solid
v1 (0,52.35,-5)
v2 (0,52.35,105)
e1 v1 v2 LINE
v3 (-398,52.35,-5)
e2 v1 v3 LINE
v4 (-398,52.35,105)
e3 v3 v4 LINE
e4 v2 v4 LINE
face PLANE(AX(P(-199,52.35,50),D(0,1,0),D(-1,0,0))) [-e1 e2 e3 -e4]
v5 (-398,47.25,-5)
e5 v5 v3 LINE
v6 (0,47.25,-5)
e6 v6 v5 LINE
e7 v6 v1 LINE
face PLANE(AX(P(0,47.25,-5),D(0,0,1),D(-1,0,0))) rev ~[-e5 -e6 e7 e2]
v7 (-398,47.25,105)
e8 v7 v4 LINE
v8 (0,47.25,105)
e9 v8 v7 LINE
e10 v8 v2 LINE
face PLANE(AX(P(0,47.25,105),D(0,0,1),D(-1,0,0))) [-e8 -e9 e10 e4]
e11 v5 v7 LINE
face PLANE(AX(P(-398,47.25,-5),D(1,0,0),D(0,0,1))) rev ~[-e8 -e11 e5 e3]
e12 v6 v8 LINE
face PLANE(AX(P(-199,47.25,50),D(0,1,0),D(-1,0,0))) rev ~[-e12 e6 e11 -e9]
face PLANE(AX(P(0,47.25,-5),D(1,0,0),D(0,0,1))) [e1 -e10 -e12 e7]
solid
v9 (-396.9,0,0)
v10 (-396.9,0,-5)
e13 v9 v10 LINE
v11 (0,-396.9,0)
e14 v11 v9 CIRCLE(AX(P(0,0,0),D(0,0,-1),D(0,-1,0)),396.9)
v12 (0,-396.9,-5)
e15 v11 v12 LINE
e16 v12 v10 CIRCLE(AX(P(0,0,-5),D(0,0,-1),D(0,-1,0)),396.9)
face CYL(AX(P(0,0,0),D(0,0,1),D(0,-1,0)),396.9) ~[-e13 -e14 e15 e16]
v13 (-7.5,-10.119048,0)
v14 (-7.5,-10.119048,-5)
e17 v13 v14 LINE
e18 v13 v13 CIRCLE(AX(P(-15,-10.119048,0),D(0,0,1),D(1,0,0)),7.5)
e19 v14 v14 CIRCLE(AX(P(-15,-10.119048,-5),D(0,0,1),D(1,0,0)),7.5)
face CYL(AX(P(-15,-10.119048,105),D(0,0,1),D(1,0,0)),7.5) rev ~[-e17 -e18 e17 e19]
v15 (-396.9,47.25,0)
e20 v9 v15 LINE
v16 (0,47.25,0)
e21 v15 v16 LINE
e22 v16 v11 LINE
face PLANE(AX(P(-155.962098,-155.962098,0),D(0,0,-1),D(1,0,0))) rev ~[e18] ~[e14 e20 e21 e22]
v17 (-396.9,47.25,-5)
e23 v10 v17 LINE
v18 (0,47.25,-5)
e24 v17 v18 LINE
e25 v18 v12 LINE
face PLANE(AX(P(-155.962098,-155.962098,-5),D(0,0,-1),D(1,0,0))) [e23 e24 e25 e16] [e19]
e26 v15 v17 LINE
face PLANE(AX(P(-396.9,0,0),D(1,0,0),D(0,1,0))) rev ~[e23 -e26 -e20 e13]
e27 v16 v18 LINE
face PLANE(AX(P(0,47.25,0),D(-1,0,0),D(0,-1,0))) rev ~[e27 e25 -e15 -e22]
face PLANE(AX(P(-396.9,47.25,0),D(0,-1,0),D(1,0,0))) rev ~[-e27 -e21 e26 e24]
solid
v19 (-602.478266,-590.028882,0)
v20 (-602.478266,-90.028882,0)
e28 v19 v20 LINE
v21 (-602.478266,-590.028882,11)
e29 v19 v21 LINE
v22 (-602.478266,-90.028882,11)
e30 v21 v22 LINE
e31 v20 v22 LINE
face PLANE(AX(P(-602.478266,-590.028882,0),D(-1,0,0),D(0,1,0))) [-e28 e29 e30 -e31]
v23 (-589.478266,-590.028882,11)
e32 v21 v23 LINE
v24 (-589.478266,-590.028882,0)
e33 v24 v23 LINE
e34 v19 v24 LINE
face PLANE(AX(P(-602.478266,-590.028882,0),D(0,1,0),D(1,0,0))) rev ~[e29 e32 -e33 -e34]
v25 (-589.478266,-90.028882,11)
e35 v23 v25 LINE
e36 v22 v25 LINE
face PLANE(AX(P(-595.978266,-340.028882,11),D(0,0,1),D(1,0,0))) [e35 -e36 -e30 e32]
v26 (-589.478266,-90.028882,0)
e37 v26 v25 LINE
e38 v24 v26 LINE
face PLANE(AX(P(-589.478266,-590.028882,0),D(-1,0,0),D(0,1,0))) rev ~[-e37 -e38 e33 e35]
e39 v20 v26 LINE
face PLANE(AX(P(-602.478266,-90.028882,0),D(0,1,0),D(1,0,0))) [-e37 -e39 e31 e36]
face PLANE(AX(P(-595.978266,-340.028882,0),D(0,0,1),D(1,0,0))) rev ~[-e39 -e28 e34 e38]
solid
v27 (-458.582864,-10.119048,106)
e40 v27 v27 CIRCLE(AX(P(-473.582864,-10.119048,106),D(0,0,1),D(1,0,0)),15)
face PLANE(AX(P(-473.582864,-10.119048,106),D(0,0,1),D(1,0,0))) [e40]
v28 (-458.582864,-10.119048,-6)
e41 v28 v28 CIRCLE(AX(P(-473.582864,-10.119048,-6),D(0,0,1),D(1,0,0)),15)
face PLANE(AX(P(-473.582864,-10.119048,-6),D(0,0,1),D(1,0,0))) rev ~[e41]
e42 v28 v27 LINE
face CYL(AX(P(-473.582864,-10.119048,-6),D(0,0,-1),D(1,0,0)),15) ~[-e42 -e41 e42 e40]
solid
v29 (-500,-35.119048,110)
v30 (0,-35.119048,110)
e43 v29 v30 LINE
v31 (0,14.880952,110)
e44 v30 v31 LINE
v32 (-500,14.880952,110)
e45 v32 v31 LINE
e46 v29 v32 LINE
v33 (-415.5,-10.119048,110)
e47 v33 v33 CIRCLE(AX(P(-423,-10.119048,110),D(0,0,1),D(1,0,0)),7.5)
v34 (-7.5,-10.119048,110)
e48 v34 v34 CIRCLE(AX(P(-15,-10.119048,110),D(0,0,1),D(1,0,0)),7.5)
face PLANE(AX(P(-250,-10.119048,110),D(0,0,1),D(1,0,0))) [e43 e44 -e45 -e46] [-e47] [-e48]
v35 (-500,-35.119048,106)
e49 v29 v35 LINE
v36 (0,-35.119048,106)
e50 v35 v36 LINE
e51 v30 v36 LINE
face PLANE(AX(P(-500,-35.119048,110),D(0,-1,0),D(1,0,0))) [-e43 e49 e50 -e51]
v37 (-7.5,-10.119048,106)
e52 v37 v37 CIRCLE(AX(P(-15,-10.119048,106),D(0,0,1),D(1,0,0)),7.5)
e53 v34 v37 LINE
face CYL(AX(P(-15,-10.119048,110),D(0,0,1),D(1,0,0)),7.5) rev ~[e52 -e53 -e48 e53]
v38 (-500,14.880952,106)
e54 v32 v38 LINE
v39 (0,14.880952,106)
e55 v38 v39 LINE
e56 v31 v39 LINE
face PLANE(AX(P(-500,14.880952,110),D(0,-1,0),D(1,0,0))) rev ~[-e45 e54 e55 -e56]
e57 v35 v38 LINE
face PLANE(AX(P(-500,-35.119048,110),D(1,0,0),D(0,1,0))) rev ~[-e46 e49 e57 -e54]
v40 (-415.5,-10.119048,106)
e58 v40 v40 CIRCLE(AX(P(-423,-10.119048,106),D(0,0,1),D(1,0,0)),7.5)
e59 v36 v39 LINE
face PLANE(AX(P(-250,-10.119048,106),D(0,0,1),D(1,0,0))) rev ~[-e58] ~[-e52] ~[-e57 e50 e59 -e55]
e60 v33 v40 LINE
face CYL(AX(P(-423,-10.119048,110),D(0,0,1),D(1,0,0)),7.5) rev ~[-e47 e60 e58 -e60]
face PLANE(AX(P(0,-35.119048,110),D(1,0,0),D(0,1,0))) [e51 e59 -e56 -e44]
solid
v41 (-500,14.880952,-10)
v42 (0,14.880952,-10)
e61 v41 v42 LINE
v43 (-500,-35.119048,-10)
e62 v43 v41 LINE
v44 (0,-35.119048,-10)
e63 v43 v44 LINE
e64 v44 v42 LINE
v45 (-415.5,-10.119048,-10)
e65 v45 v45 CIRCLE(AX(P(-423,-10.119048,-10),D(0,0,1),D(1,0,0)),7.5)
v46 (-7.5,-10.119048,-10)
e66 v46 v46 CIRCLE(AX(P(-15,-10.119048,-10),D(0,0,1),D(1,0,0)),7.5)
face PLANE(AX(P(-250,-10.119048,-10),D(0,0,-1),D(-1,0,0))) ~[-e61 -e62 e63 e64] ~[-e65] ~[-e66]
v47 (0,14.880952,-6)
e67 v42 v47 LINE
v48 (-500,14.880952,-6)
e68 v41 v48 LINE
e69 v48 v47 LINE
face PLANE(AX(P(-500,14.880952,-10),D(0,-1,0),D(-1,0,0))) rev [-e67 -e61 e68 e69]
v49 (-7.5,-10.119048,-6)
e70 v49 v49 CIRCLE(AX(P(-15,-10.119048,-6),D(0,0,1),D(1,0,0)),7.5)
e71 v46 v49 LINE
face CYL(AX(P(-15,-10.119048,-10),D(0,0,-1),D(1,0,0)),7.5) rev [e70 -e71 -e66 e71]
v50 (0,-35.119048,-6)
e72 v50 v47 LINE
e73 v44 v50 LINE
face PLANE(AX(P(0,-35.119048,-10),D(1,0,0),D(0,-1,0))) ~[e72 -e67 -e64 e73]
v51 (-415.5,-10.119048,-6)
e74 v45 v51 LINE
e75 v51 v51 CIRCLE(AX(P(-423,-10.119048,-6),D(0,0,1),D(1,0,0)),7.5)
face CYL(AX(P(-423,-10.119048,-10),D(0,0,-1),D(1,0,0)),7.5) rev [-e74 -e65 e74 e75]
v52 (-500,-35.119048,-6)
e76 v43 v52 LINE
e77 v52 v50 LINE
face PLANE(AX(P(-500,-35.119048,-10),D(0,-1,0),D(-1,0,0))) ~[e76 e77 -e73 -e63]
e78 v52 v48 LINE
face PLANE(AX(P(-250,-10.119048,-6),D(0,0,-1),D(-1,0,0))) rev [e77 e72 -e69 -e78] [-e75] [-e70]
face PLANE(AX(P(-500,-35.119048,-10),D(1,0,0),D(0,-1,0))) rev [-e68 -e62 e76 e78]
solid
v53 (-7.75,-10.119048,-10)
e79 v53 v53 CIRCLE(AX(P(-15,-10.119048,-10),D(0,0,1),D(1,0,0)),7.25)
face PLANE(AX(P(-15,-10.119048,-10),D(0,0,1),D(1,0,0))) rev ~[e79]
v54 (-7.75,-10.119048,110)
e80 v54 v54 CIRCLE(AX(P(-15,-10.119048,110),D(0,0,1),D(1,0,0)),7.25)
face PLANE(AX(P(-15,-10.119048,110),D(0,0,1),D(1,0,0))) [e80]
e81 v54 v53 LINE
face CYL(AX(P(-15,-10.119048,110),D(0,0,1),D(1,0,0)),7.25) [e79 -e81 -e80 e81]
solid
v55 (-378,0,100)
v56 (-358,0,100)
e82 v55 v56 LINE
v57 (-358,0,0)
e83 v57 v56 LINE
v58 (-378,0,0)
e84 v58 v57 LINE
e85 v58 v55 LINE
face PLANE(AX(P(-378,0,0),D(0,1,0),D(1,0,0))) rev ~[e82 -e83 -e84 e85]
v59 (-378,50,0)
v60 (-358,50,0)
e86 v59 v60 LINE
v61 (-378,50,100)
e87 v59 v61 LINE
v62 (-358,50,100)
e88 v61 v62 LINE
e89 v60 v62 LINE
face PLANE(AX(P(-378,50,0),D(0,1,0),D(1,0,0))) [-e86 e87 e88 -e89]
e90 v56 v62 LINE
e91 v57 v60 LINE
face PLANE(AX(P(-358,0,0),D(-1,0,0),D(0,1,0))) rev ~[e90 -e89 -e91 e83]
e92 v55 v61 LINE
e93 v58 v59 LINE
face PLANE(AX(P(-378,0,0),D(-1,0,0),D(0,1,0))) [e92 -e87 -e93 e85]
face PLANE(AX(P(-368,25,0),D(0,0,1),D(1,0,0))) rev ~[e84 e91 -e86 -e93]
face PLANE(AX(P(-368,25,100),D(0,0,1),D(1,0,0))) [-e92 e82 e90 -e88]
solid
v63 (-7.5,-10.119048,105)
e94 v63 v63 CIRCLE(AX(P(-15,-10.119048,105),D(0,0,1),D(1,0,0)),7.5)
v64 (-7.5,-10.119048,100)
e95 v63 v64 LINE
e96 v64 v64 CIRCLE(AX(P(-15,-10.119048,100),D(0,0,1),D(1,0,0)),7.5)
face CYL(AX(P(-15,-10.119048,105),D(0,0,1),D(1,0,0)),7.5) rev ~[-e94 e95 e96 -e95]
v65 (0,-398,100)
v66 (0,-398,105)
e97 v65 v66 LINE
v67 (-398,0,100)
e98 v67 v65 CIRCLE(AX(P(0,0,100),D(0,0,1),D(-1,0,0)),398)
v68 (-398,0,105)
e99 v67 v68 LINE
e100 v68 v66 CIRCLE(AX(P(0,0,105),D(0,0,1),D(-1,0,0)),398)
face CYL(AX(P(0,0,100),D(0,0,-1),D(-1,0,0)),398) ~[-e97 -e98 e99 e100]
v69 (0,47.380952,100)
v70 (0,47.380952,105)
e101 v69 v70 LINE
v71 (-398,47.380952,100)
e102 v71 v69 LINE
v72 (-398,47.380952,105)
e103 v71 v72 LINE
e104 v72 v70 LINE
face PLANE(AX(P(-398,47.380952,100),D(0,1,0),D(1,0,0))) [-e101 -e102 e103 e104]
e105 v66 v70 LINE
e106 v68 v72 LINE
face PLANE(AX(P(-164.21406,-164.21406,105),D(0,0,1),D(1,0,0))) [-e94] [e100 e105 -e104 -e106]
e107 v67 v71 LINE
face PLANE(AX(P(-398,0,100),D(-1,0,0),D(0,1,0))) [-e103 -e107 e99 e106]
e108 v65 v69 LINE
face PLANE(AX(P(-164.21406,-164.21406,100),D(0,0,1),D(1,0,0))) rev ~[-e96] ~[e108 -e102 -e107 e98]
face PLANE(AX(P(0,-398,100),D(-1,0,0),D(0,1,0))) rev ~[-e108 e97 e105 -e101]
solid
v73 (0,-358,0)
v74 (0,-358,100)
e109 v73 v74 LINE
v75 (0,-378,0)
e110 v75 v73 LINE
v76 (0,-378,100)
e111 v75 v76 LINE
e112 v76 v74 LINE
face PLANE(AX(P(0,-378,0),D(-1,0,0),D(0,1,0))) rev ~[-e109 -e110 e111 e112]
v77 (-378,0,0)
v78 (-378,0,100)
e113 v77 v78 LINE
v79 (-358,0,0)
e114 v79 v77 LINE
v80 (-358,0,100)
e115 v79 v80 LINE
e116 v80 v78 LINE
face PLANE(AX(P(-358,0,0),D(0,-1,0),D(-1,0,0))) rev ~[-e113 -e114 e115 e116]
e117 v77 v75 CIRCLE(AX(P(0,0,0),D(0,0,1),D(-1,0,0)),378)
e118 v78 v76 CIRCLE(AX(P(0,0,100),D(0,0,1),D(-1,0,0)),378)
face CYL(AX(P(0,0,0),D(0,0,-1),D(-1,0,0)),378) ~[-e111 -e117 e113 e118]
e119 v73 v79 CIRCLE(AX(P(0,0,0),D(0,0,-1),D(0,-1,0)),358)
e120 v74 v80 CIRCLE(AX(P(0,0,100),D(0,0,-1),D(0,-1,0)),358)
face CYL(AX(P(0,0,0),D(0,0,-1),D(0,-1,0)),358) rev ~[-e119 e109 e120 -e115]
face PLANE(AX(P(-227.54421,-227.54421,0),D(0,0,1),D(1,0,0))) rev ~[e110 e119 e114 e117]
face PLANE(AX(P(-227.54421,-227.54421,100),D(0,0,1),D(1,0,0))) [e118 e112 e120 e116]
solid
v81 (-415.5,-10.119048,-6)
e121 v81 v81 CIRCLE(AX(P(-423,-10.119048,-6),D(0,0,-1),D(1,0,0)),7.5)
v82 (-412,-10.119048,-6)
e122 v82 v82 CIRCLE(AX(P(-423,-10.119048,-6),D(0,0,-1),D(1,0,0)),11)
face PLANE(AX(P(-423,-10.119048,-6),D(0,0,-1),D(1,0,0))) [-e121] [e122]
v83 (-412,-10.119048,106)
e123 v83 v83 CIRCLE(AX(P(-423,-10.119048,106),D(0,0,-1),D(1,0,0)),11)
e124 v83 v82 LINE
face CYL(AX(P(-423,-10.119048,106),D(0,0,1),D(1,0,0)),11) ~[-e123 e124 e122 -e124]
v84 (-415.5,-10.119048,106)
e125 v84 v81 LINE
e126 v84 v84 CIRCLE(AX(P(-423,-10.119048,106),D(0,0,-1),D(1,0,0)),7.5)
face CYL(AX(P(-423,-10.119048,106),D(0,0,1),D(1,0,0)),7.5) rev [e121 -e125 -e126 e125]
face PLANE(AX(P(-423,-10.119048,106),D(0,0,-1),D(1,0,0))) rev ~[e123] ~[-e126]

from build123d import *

# Parameters (mm, degrees)
F1_DEPTH  = 100
F4_DEPTH  = 5
F6_W      = 398
F6_H      = 47.380952381
F7_DEPTH  = 5
F9_W      = 398
F9_H      = 110
F10_DEPTH = 5.1
F11_R     = 7.5
F12_DEPTH = 110.001
F14_R     = 7.25
F15_DEPTH = 120
F17_W     = 500
F17_H     = 50
F17_R     = 7.5
F18_DEPTH = 4
F0_W      = 20
F0_H      = 50
F21_DEPTH = 100
F22_R     = 15
F23_DEPTH = 112
F24_R     = 11
F24_R_2   = 7.5
F25_DEPTH = 112
F26_W     = 13
F26_H     = 500
F27_DEPTH = 11


# Not quite as in the source:
# - a feature names something its author has since deleted; it is built from what else it names


with BuildPart() as f1:
    # F0 (on Top) → F1 (new body)
    with BuildSketch(Plane.XY):
        with BuildLine():
            ThreePointArc((0, -358), (-253.1442276648, -253.1442276648), (-358, 0))
            Line((-358, 0), (-378, 0))
            ThreePointArc((-378, 0), (-267.2863632885, -267.2863632885), (0, -378))
            Line((0, -378), (0, -358))
        make_face()
    extrude(amount=F1_DEPTH)


with BuildPart() as f4:
    # F3 (on offset) → F4 (new body)
    with BuildSketch(Plane(origin=(0, 0, 0), x_dir=(1, 0, 0), z_dir=(0, 0, -1))):
        with BuildLine():
            Line((-378, 0), (0, 0))
            Line((0, 0), (0, 378))
            ThreePointArc((0, 378), (-267.2863632885, 267.2863632885), (-378, 0))
        make_face()
        Polygon((0, -47.25), (0, 0), (-378, 0), (-396.9, 0), (-396.9, -47.25), align=None)
        with BuildLine():
            ThreePointArc((-378, 0), (-267.2863632885, 267.2863632885), (0, 378))
            Line((0, 378), (0, 396.9))
            ThreePointArc((0, 396.9), (-280.6506814529, 280.6506814529), (-396.9, 0))
            Line((-396.9, 0), (-378, 0))
        make_face()
    extrude(amount=F4_DEPTH)


with BuildPart() as f7:
    # F6 (on offset) → F7 (new body)
    with BuildSketch(Plane.XY.offset(100)):
        with BuildLine():
            Line((0, -398), (0, 0))
            Line((0, 0), (-398, 0))
            ThreePointArc((-398, 0), (-281.4284989122, -281.4284989122), (0, -398))
        make_face()
        with Locations((-199, 23.6904761905)):
            Rectangle(F6_W, F6_H)
    extrude(amount=F7_DEPTH)


with BuildPart() as f10:
    # F9 (on offset) → F10 (new body)
    with BuildSketch(Plane(origin=(0, 47.25, 0), x_dir=(-1, 0, 0), z_dir=(0, 1, 0))):
        with Locations((199, 50)):
            Rectangle(F9_W, F9_H)
    extrude(amount=F10_DEPTH)


with BuildPart() as f12_tool:
    # F11 (on face) → F12 (new body, through all)
    with BuildSketch(Plane.XY.offset(105)):
        with Locations((-15, -10.119047619)):
            Circle(F11_R)
    extrude(amount=-F12_DEPTH)


with BuildPart() as f4_1:
    add(f4.part)

    # F12: cut by f12_tool
    add(f12_tool.part, mode=Mode.SUBTRACT)


with BuildPart() as f7_1:
    add(f7.part)

    # F12: cut by f12_tool
    add(f12_tool.part, mode=Mode.SUBTRACT)


with BuildPart() as f15:
    # F14 (on offset) → F15 (new body)
    with BuildSketch(Plane.XY.offset(110)):
        with Locations((-15, -10.119047619)):
            Circle(F14_R)
    extrude(amount=-F15_DEPTH)


with BuildPart() as f18:
    # F17 (on offset) → F18 (new body)
    with BuildSketch(Plane.XY.offset(110)):
        with Locations((-250, -10.119047619)):
            Rectangle(F17_W, F17_H)
        with Locations((-423, -10.119047619)):
            Circle(F17_R, mode=Mode.SUBTRACT)
        with Locations((-15, -10.119047619)):
            Circle(F17_R, mode=Mode.SUBTRACT)
    extrude(amount=-F18_DEPTH)


with BuildPart() as f20_1:
    # F20: instance of F18
    add(f18.part.mirror(Plane(origin=(-234.3337410657, -234.3337410657, 50), x_dir=(1, 0, 0), z_dir=(0, 0, 1))))


with BuildPart() as f21:
    # F0 (on Top) → F21 (new body)
    with BuildSketch(Plane.XY):
        with Locations((-368, 25)):
            Rectangle(F0_W, F0_H)
    extrude(amount=F21_DEPTH)


with BuildPart() as f23:
    # F22 (on face) → F23 (new body, through all)
    with BuildSketch(Plane.XY.offset(-6)):
        with Locations((-473.5828638077, -10.119047619)):
            Circle(F22_R)
    extrude(amount=F23_DEPTH)


with BuildPart() as f25:
    # F24 (on face) → F25 (new body, through all)
    with BuildSketch(Plane(origin=(0, 0, 106), x_dir=(1, 0, 0), z_dir=(0, 0, -1))):
        with Locations((-423, 10.119047619)):
            Circle(F24_R)
        with Locations((-423, 10.119047619)):
            Circle(F24_R_2, mode=Mode.SUBTRACT)
    extrude(amount=F25_DEPTH)


with BuildPart() as f27:
    # F26 (on Top) → F27 (new body)
    with BuildSketch(Plane.XY):
        with Locations((-595.9782657623, -340.0288820267)):
            Rectangle(F26_W, F26_H)
    extrude(amount=F27_DEPTH)


solid = Compound([f1.part, f10.part, f4_1.part, f7_1.part, f15.part, f18.part, f20_1.part, f21.part, f23.part, f25.part, f27.part])
